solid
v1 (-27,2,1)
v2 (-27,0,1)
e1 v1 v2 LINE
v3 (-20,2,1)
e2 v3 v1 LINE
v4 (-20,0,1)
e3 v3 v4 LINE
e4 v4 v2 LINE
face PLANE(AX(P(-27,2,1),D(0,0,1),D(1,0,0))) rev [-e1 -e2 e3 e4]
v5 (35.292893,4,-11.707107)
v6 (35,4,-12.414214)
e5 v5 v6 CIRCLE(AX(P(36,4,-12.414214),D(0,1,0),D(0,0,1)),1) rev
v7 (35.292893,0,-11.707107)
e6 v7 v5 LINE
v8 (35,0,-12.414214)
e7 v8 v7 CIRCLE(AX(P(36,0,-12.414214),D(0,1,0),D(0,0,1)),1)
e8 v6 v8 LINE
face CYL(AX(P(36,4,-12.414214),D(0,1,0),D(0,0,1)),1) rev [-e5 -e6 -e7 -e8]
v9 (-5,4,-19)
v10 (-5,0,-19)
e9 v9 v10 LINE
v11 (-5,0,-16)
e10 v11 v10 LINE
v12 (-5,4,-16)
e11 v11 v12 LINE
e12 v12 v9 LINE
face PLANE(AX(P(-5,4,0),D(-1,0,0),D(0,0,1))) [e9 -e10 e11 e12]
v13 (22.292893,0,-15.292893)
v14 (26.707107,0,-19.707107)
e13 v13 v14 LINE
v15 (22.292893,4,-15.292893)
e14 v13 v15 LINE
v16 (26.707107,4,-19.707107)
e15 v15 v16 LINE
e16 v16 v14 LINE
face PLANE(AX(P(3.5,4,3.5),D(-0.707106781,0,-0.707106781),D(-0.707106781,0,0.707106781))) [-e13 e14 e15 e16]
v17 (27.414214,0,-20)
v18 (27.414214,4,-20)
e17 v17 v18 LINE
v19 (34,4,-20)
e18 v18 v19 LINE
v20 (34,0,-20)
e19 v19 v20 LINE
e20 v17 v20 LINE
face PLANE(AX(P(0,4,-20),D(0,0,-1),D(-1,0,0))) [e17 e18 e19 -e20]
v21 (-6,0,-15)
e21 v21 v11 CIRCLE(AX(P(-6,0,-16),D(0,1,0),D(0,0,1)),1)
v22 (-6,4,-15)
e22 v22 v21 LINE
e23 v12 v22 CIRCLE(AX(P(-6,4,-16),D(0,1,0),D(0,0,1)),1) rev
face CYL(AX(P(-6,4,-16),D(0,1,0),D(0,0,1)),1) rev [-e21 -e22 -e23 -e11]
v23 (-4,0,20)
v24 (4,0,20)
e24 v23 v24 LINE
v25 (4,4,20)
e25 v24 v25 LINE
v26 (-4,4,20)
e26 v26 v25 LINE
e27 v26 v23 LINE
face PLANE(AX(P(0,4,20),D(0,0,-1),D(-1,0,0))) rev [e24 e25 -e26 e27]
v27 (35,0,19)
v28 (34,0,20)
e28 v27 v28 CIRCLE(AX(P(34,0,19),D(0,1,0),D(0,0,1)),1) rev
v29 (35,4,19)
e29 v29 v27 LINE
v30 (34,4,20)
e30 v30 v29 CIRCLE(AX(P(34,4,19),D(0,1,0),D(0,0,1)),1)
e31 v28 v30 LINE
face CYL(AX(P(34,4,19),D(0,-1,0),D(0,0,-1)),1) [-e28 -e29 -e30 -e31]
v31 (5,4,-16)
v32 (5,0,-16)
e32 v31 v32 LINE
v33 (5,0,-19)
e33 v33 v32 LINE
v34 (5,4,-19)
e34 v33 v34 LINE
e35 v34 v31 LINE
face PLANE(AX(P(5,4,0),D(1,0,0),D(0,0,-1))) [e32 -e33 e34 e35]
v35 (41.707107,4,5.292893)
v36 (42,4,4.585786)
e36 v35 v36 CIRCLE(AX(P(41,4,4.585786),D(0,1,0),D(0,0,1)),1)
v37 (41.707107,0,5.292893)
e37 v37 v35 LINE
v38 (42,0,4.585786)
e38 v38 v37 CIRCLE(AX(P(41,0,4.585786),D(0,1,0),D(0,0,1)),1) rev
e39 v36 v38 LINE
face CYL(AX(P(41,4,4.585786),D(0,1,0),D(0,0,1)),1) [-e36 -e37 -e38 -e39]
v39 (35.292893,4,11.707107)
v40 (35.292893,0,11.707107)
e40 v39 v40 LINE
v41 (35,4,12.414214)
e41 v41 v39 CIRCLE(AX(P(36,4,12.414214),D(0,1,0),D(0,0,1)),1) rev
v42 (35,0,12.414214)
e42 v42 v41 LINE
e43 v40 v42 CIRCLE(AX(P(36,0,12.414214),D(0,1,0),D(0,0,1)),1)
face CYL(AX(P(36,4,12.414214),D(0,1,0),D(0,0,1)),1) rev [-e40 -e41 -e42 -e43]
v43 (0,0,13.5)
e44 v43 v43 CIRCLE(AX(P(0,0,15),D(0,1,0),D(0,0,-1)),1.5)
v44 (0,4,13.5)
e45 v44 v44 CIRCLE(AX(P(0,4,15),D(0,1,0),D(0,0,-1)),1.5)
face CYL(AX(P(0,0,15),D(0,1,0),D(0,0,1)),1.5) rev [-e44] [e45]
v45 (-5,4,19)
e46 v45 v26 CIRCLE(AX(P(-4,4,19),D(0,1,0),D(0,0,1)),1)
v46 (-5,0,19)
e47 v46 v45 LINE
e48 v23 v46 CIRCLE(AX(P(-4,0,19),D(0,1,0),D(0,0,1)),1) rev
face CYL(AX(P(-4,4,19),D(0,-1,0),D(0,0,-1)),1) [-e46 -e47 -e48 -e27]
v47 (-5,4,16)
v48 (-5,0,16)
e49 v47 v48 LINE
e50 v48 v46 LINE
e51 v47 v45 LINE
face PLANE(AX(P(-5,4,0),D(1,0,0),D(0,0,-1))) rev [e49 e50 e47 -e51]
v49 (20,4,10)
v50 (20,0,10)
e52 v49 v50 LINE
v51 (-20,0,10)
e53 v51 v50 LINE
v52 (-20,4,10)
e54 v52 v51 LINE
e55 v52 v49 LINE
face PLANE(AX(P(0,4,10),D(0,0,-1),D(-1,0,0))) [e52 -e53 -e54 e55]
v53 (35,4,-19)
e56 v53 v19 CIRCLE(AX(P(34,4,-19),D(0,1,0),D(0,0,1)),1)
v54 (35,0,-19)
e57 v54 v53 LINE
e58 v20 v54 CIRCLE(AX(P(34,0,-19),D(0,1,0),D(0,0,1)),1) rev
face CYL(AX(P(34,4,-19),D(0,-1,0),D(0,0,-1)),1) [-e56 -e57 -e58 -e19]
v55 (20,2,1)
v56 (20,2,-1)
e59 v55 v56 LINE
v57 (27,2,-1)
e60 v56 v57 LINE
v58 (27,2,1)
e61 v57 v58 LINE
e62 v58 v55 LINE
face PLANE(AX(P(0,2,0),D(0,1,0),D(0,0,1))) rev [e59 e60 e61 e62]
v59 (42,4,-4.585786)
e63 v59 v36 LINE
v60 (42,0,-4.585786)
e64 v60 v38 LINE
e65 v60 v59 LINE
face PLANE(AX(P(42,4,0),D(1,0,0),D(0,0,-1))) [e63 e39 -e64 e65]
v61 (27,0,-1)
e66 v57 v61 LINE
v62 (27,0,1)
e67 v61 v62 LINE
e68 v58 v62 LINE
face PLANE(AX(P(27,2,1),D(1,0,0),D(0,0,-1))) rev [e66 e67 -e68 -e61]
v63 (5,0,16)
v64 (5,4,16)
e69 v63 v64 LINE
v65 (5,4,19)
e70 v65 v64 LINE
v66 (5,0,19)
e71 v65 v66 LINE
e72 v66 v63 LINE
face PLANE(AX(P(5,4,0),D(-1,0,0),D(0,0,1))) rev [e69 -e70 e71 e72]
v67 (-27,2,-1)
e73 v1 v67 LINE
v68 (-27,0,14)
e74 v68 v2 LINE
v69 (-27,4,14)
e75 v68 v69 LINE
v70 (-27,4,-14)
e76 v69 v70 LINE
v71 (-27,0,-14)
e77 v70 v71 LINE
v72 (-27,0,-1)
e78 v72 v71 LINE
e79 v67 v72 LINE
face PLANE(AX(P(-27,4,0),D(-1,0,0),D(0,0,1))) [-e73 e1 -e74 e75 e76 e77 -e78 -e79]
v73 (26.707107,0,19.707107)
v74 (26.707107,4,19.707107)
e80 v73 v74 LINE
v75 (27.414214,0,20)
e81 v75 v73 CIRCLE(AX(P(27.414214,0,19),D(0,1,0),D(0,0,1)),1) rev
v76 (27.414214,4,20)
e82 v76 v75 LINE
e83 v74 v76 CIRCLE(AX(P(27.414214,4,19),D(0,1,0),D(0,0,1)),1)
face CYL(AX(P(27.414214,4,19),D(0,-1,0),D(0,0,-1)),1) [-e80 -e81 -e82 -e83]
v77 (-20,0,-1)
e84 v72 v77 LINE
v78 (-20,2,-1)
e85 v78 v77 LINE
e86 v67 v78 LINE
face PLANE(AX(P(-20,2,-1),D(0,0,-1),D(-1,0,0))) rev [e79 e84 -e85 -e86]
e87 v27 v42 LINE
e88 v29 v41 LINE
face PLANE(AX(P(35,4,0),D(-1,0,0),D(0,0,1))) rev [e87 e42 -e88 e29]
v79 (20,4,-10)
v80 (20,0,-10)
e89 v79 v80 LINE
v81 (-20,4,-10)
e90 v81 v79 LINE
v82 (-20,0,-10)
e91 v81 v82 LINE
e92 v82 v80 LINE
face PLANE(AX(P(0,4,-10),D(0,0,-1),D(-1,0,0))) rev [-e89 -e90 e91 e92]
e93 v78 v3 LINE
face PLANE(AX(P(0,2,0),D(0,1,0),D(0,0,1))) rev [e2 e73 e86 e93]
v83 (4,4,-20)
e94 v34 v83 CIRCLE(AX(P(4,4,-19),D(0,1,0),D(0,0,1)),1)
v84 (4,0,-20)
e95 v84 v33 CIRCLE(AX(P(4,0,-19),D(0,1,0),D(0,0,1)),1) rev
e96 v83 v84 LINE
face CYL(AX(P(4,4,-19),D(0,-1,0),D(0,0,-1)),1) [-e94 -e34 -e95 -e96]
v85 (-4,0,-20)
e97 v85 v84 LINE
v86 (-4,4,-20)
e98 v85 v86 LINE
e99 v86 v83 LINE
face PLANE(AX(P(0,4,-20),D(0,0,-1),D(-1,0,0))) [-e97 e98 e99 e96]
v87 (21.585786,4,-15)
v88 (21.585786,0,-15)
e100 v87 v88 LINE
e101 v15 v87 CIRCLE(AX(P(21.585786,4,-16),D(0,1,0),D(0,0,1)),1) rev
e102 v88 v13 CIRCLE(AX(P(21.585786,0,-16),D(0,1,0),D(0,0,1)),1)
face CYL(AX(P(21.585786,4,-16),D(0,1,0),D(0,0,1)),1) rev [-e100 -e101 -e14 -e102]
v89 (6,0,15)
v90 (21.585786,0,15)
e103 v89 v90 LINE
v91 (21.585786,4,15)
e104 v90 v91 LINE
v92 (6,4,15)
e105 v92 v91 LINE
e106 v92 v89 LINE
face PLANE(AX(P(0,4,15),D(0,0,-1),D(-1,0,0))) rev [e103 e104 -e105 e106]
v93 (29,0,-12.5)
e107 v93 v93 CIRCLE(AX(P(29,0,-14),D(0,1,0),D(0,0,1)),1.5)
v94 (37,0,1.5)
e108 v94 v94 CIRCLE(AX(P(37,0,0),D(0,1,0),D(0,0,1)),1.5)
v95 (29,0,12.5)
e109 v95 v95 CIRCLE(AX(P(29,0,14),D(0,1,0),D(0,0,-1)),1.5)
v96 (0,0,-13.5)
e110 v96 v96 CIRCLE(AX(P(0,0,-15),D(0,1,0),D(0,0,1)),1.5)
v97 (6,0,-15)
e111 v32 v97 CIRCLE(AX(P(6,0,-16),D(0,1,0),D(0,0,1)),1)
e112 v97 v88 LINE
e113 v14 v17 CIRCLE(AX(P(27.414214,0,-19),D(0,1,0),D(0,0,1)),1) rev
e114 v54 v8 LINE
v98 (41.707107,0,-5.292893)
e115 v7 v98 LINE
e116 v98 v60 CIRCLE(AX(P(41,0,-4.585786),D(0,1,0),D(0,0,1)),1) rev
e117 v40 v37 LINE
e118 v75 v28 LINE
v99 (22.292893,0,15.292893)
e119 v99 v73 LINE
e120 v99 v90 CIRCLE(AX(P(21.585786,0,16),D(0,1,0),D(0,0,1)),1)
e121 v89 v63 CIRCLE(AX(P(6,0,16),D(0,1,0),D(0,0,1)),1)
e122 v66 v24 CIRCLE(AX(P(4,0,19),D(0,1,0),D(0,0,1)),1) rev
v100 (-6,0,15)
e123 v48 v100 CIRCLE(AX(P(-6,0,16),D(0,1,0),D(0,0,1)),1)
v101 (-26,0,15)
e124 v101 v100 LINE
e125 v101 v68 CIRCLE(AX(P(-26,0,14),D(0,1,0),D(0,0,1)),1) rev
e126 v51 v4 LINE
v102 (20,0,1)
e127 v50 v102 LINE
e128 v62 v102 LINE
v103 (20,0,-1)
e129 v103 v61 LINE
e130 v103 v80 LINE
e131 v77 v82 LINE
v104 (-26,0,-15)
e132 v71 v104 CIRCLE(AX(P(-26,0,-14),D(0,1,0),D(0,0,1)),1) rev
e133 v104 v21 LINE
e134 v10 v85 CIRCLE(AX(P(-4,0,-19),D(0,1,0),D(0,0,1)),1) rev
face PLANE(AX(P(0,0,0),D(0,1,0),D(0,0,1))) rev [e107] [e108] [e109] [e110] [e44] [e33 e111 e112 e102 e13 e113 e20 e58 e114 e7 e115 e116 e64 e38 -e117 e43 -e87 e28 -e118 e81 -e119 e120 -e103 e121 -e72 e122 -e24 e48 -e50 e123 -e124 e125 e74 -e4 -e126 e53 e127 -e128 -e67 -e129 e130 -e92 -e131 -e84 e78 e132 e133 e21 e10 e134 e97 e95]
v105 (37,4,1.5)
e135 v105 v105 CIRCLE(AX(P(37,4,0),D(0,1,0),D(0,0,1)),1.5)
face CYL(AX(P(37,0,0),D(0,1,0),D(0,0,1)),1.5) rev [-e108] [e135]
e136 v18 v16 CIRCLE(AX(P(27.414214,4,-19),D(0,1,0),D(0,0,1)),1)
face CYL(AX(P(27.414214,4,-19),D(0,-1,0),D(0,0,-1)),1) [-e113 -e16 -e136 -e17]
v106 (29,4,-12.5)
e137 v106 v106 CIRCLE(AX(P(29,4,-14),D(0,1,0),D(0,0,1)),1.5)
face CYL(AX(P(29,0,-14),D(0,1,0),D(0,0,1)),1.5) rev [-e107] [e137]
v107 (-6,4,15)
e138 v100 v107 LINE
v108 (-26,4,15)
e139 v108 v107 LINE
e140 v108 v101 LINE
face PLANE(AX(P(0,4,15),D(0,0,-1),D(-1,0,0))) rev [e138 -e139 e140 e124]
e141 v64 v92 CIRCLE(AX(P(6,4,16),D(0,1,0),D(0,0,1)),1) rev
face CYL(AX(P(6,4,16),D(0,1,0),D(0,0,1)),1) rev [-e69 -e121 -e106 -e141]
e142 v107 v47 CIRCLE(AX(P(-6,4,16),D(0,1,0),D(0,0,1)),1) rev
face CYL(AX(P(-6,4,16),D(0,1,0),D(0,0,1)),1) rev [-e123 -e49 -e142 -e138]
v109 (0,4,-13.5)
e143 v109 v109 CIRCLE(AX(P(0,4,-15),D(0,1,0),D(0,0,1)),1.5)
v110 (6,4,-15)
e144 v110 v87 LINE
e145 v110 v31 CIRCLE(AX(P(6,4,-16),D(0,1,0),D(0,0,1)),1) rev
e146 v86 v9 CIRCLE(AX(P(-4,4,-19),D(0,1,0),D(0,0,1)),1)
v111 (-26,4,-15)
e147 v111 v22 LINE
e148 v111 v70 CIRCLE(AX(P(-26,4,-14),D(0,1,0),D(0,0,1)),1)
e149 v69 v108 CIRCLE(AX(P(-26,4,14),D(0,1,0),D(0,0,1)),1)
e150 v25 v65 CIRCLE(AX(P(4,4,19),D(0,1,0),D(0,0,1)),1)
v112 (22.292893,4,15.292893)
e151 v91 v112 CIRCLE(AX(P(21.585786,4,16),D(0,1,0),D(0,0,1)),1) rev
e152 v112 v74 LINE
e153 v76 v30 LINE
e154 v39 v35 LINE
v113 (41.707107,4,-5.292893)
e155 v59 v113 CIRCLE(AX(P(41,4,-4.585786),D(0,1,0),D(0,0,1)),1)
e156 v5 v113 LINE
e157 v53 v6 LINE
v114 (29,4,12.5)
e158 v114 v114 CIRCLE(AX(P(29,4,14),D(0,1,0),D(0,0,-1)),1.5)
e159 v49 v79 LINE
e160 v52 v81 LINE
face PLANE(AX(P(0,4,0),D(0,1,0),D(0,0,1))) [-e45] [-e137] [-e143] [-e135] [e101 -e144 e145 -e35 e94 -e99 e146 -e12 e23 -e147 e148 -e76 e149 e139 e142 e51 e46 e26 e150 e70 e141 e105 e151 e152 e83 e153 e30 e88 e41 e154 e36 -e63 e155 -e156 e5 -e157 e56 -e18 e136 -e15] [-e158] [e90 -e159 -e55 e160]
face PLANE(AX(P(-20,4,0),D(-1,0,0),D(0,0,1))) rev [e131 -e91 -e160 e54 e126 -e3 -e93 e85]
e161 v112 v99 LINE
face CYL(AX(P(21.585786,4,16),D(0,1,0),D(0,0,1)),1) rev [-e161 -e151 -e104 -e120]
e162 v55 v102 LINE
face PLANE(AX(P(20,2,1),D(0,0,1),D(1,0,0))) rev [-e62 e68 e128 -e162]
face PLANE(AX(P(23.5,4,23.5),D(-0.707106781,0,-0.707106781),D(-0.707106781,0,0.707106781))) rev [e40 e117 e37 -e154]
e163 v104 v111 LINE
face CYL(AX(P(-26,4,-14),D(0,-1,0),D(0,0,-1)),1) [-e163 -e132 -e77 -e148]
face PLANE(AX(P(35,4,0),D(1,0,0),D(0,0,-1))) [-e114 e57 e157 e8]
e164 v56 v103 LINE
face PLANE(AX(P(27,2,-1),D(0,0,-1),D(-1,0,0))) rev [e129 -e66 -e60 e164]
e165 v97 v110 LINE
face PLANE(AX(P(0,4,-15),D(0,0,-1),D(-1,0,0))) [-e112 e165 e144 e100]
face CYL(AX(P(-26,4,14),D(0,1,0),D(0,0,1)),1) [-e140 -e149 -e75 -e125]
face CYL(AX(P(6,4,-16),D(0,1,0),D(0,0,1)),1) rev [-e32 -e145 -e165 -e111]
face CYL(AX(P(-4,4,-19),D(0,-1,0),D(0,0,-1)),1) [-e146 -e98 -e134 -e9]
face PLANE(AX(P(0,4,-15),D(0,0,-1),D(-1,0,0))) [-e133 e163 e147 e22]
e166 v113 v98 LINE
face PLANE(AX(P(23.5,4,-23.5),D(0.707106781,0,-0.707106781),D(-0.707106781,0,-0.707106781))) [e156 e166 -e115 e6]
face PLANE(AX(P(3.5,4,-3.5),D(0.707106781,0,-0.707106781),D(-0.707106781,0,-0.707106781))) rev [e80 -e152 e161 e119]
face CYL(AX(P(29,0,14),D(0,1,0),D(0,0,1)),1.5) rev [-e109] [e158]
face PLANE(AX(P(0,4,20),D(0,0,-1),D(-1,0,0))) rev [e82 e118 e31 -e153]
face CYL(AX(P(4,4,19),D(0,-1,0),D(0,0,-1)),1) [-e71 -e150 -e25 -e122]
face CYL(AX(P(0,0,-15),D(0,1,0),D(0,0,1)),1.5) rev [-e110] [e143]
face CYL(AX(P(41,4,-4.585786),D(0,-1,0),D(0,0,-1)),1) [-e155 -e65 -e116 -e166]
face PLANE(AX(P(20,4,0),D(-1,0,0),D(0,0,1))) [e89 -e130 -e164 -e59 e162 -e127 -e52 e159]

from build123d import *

# Parameters (mm, degrees)
EXTRUDE_1_OUTLINE_W = 40
EXTRUDE_1_OUTLINE_H = 20
EXTRUDE_1_DEPTH     = 4
SKETCH_2_R          = 1.5
CUT_EXTRUDE_1_DEPTH = 47.69047012
SKETCH_3_W          = 7
SKETCH_3_H          = 2
CUT_EXTRUDE_2_DEPTH = 2
FILLET_1_R          = 1


# Read off the part's stored shape, not the designer's step: 凸台-拉伸1
with BuildPart() as part:
    # 凸台-拉伸1 outline → 凸台-拉伸1 (new body)
    with BuildSketch(Plane(origin=(0, 0, 0), x_dir=(1, 0, 0), z_dir=(0, 1, 0))):
        Polygon((-27, -15), (-5, -15), (-5, -20), (5, -20), (5, -15), (22, -15), (27, -20), (35, -20), (35, -12), (42, -5), (42, 5), (35, 12), (35, 20), (27, 20), (22, 15), (5, 15), (5, 20), (-5, 20), (-5, 15), (-27, 15), align=None)
        Rectangle(EXTRUDE_1_OUTLINE_W, EXTRUDE_1_OUTLINE_H, mode=Mode.SUBTRACT)
    extrude(amount=EXTRUDE_1_DEPTH)

    # 草图2 → 切除-拉伸1 (cut, through all)
    with BuildSketch(Plane(origin=(0, 4, 0), x_dir=(1, 0, 0), z_dir=(0, 1, 0))):
        with Locations(Location((0, 15, 0), (0, 0, 270))):
            Circle(SKETCH_2_R)
        with Locations(Location((0, -15, 0), (0, 0, 90))):
            Circle(SKETCH_2_R)
        with Locations(Location((29, 14, 0), (0, 0, 270))):
            Circle(SKETCH_2_R)
        with Locations(Location((29, -14, 0), (0, 0, 90))):
            Circle(SKETCH_2_R)
        with Locations(Location((37, 0, 0), (0, 0, 270))):
            Circle(SKETCH_2_R)
    extrude(amount=-CUT_EXTRUDE_1_DEPTH, mode=Mode.SUBTRACT)

    # 草图3 → 切除-拉伸2 (cut)
    with BuildSketch(Plane.XZ):
        with Locations((-23.5, 0)):
            Rectangle(SKETCH_3_W, SKETCH_3_H)
        with Locations((23.5, 0)):
            Rectangle(SKETCH_3_W, SKETCH_3_H)
    extrude(amount=-CUT_EXTRUDE_2_DEPTH, mode=Mode.SUBTRACT)

    # 圆角1
    fillet_1_edges = [part.edges().sort_by_distance(p)[0] for p in [
        (-27, 2, 15),
        (-27, 2, -15),
        (-5, 2, -15),
        (-5, 2, -20),
        (5, 2, -20),
        (5, 2, -15),
        (22, 2, -15),
        (27, 2, -20),
        (35, 2, -20),
        (35, 2, -12),
        (42, 2, -5),
        (42, 2, 5),
        (35, 2, 12),
        (35, 2, 20),
        (27, 2, 20),
        (22, 2, 15),
        (5, 2, 15),
        (5, 2, 20),
        (-5, 2, 20),
        (-5, 2, 15),
    ]]
    fillet(fillet_1_edges, radius=FILLET_1_R)


solid = part.part
